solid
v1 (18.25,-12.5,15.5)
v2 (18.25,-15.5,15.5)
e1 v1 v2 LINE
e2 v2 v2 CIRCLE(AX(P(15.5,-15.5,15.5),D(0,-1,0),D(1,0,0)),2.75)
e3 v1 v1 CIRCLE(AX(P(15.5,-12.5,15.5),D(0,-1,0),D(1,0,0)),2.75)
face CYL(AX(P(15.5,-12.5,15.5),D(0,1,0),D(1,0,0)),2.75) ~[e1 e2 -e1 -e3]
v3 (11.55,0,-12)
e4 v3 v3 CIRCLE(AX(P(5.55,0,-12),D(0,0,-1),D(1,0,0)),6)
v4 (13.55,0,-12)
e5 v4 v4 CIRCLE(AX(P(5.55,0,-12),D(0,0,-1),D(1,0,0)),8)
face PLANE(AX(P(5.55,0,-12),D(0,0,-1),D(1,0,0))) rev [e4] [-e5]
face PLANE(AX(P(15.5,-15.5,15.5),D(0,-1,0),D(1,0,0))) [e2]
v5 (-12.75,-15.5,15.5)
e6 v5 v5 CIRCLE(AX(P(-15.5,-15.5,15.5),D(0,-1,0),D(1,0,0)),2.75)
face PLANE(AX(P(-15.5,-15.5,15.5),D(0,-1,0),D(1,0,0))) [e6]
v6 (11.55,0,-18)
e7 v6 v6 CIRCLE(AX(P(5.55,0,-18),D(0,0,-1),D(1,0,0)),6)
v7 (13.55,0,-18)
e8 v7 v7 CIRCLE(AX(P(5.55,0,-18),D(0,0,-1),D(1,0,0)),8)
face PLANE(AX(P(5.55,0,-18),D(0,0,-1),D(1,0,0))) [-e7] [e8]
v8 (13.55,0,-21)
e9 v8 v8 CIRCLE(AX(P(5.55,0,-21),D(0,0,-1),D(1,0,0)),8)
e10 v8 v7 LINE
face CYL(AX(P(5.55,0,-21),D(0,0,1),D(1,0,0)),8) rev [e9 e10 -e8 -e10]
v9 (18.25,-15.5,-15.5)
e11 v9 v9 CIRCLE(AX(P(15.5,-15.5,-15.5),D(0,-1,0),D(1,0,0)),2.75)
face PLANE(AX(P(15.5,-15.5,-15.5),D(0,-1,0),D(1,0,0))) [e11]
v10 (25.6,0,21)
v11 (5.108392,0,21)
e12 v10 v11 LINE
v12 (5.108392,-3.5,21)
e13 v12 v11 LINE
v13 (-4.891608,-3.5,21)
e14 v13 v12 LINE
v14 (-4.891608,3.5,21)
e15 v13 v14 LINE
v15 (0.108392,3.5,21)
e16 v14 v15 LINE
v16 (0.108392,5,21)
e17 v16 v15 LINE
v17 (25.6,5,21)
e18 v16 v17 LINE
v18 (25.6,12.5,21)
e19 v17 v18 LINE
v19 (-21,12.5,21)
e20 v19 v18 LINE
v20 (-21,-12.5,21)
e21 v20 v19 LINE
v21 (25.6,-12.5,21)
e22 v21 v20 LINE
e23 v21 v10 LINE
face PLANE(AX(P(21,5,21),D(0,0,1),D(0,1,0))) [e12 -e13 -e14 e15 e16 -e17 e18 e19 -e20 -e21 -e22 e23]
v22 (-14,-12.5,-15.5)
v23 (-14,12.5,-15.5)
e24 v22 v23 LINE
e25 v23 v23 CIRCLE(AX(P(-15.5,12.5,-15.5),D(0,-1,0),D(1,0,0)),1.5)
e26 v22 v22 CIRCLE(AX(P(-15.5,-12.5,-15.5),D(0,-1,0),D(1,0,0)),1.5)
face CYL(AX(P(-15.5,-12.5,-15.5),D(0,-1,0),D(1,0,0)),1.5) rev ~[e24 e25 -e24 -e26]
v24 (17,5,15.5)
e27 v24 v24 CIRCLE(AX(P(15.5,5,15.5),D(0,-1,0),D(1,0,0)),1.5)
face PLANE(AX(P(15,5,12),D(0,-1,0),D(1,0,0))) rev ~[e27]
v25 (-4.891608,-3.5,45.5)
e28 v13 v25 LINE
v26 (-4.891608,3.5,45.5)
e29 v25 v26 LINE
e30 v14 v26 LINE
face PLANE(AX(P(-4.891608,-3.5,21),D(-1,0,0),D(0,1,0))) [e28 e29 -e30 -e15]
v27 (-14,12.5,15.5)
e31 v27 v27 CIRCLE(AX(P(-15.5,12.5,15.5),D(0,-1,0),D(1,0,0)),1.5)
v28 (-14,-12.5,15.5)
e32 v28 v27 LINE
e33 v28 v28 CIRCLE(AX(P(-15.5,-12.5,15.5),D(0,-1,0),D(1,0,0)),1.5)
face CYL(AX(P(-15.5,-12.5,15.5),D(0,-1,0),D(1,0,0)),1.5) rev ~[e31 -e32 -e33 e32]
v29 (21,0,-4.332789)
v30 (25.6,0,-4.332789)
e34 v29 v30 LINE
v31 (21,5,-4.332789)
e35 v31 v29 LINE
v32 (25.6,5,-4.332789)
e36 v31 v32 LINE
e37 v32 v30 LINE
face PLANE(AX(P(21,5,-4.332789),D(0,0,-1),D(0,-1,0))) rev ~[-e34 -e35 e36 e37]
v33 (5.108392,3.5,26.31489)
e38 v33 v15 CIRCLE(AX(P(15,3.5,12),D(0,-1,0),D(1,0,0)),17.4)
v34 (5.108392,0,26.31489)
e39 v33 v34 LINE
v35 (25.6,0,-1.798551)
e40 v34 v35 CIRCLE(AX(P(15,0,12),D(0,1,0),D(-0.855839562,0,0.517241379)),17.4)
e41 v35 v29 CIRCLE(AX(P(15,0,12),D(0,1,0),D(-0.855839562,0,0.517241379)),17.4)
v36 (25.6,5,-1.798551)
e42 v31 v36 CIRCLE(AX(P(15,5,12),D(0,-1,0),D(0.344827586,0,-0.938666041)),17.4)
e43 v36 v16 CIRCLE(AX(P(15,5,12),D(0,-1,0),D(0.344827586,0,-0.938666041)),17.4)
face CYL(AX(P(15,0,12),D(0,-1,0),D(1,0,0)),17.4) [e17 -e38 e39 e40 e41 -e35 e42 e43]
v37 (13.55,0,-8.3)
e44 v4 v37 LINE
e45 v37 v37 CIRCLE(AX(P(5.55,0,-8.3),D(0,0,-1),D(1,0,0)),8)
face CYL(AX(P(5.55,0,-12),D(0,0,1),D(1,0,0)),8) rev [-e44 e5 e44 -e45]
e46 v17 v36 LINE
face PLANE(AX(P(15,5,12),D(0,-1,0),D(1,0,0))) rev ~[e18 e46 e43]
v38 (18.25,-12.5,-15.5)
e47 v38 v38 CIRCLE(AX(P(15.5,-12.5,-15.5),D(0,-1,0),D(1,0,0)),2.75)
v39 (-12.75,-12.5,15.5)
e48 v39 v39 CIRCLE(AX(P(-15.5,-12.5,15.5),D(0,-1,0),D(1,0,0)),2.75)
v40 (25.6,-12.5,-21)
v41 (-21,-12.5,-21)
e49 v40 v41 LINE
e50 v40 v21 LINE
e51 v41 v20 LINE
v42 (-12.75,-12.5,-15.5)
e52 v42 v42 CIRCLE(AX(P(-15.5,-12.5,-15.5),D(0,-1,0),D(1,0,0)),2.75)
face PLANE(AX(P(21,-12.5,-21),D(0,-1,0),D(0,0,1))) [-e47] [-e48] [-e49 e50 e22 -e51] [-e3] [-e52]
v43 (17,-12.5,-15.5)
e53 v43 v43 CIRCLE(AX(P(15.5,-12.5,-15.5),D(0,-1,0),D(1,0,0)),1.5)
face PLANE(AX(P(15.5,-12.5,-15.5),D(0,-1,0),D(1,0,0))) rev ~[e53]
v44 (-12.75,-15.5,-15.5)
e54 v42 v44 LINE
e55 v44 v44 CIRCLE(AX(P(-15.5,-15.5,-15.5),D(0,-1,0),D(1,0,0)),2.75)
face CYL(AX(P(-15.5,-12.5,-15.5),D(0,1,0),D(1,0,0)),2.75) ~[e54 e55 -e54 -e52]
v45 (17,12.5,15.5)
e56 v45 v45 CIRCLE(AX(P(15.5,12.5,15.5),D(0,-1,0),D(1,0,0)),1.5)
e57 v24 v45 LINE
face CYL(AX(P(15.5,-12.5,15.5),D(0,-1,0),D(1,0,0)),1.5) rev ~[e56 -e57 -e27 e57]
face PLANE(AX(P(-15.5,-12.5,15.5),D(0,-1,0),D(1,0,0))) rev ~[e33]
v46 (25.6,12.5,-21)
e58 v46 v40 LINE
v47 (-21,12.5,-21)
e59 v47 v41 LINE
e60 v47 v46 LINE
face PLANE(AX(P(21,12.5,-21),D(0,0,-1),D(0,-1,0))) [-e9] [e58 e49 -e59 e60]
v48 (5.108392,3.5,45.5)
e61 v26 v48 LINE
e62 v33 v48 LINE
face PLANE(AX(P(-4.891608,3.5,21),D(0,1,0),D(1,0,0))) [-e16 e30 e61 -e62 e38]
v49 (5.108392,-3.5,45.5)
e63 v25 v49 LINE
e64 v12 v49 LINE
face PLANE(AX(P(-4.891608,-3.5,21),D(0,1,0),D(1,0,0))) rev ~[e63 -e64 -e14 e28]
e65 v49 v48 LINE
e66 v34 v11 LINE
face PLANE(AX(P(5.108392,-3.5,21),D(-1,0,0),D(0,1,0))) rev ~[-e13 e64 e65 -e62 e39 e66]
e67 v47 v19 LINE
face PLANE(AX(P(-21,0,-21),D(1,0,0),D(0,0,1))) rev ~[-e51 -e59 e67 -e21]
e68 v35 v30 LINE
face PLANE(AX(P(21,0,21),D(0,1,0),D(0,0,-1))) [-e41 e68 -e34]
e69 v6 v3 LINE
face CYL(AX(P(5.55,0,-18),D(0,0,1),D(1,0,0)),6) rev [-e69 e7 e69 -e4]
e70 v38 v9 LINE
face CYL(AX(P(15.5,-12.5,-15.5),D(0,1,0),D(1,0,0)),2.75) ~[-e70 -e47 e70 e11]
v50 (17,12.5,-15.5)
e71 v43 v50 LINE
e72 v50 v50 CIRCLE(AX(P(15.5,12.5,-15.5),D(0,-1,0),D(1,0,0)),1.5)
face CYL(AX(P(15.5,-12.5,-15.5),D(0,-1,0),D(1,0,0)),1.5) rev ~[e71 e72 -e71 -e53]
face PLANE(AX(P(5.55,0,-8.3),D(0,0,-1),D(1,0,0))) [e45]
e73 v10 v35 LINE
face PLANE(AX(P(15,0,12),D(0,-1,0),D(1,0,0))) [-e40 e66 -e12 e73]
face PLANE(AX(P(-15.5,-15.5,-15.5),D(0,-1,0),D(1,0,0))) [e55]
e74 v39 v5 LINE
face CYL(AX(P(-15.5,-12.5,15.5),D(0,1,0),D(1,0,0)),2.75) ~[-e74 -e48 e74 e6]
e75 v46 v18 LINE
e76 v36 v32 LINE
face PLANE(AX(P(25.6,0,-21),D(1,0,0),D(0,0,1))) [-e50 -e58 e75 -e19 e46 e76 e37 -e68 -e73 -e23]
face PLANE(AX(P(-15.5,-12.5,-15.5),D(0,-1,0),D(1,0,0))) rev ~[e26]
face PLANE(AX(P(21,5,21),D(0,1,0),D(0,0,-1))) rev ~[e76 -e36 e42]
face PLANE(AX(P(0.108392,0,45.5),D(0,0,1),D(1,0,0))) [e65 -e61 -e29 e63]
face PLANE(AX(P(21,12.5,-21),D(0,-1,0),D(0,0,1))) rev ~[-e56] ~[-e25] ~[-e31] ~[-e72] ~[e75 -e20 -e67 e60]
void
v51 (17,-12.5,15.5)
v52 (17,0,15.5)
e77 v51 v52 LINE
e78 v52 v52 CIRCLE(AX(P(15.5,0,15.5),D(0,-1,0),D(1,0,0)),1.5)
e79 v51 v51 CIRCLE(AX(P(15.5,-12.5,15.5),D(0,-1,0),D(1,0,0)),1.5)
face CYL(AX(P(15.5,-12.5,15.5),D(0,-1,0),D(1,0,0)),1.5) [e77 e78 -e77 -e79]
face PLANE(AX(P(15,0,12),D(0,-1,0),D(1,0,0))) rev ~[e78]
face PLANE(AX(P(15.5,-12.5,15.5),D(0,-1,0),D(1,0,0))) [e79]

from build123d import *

# Parameters (mm, degrees)
F0_W      = 42
F0_H      = 42
F1_DEPTH  = 12.5
F2_R      = 1.5
F3_DEPTH  = 25.001
F6_R      = 17.4
F7_DEPTH  = 5
F8_DEPTH  = 4.6
F9_W      = 10
F9_H      = 7
F10_DEPTH = 24.5
F11_R     = 2.75
F12_DEPTH = 3


with BuildPart() as f1:
    # F0 (on Front) → F1 (new body, symmetric)
    with BuildSketch(Plane.XZ):
        Rectangle(F0_W, F0_H)
    extrude(amount=F1_DEPTH, both=True)

    # F2 (on face) → F3 (cut, through all)
    with BuildSketch(Plane.XZ.offset(12.5)):
        with Locations((-15.5, 15.5)):
            Circle(F2_R)
        with Locations((15.5, 15.5)):
            Circle(F2_R)
        with Locations((-15.5, -15.5)):
            Circle(F2_R)
        with Locations((15.5, -15.5)):
            Circle(F2_R)
    extrude(amount=-F3_DEPTH, mode=Mode.SUBTRACT)

    # F4 (on Front) → F5 (revolve, cut)
    with BuildSketch(Plane.XZ):
        Polygon((13.55, -8.3), (5.55, -8.3), (5.55, -21), (13.55, -21), (13.55, -18), (11.55, -18), (11.55, -12), (13.55, -12), align=None)
    revolve(axis=Axis((5.55, 0, -42.7623434187), (0, 0, -1)), mode=Mode.SUBTRACT)

    # F6 (on Front) → F7 (join)
    with BuildSketch(Plane.XZ):
        with Locations((15, 12)):
            Circle(F6_R)
    extrude(amount=-F7_DEPTH)

    # F8 (add): a face of the model
    f8_faces = [f1.faces().sort_by_distance(p)[0] for p in [
        (21, -0.3429519104, -1.1432103634),
    ]]
    extrude(f8_faces, amount=F8_DEPTH)

    # F9 (on face) → F10 (join)
    with BuildSketch(Plane.XY.offset(21)):
        with Locations((0.1083916248, 0)):
            Rectangle(F9_W, F9_H)
    extrude(amount=F10_DEPTH)

    # F11 (on face) → F12 (join)
    with BuildSketch(Plane.XZ.offset(12.5)):
        with Locations((-15.5, 15.5)):
            Circle(F11_R)
        with Locations((-15.5, -15.5)):
            Circle(F11_R)
        with Locations((15.5, -15.5)):
            Circle(F11_R)
        with Locations((15.5, 15.5)):
            Circle(F11_R)
    extrude(amount=F12_DEPTH)


solid = f1.part
